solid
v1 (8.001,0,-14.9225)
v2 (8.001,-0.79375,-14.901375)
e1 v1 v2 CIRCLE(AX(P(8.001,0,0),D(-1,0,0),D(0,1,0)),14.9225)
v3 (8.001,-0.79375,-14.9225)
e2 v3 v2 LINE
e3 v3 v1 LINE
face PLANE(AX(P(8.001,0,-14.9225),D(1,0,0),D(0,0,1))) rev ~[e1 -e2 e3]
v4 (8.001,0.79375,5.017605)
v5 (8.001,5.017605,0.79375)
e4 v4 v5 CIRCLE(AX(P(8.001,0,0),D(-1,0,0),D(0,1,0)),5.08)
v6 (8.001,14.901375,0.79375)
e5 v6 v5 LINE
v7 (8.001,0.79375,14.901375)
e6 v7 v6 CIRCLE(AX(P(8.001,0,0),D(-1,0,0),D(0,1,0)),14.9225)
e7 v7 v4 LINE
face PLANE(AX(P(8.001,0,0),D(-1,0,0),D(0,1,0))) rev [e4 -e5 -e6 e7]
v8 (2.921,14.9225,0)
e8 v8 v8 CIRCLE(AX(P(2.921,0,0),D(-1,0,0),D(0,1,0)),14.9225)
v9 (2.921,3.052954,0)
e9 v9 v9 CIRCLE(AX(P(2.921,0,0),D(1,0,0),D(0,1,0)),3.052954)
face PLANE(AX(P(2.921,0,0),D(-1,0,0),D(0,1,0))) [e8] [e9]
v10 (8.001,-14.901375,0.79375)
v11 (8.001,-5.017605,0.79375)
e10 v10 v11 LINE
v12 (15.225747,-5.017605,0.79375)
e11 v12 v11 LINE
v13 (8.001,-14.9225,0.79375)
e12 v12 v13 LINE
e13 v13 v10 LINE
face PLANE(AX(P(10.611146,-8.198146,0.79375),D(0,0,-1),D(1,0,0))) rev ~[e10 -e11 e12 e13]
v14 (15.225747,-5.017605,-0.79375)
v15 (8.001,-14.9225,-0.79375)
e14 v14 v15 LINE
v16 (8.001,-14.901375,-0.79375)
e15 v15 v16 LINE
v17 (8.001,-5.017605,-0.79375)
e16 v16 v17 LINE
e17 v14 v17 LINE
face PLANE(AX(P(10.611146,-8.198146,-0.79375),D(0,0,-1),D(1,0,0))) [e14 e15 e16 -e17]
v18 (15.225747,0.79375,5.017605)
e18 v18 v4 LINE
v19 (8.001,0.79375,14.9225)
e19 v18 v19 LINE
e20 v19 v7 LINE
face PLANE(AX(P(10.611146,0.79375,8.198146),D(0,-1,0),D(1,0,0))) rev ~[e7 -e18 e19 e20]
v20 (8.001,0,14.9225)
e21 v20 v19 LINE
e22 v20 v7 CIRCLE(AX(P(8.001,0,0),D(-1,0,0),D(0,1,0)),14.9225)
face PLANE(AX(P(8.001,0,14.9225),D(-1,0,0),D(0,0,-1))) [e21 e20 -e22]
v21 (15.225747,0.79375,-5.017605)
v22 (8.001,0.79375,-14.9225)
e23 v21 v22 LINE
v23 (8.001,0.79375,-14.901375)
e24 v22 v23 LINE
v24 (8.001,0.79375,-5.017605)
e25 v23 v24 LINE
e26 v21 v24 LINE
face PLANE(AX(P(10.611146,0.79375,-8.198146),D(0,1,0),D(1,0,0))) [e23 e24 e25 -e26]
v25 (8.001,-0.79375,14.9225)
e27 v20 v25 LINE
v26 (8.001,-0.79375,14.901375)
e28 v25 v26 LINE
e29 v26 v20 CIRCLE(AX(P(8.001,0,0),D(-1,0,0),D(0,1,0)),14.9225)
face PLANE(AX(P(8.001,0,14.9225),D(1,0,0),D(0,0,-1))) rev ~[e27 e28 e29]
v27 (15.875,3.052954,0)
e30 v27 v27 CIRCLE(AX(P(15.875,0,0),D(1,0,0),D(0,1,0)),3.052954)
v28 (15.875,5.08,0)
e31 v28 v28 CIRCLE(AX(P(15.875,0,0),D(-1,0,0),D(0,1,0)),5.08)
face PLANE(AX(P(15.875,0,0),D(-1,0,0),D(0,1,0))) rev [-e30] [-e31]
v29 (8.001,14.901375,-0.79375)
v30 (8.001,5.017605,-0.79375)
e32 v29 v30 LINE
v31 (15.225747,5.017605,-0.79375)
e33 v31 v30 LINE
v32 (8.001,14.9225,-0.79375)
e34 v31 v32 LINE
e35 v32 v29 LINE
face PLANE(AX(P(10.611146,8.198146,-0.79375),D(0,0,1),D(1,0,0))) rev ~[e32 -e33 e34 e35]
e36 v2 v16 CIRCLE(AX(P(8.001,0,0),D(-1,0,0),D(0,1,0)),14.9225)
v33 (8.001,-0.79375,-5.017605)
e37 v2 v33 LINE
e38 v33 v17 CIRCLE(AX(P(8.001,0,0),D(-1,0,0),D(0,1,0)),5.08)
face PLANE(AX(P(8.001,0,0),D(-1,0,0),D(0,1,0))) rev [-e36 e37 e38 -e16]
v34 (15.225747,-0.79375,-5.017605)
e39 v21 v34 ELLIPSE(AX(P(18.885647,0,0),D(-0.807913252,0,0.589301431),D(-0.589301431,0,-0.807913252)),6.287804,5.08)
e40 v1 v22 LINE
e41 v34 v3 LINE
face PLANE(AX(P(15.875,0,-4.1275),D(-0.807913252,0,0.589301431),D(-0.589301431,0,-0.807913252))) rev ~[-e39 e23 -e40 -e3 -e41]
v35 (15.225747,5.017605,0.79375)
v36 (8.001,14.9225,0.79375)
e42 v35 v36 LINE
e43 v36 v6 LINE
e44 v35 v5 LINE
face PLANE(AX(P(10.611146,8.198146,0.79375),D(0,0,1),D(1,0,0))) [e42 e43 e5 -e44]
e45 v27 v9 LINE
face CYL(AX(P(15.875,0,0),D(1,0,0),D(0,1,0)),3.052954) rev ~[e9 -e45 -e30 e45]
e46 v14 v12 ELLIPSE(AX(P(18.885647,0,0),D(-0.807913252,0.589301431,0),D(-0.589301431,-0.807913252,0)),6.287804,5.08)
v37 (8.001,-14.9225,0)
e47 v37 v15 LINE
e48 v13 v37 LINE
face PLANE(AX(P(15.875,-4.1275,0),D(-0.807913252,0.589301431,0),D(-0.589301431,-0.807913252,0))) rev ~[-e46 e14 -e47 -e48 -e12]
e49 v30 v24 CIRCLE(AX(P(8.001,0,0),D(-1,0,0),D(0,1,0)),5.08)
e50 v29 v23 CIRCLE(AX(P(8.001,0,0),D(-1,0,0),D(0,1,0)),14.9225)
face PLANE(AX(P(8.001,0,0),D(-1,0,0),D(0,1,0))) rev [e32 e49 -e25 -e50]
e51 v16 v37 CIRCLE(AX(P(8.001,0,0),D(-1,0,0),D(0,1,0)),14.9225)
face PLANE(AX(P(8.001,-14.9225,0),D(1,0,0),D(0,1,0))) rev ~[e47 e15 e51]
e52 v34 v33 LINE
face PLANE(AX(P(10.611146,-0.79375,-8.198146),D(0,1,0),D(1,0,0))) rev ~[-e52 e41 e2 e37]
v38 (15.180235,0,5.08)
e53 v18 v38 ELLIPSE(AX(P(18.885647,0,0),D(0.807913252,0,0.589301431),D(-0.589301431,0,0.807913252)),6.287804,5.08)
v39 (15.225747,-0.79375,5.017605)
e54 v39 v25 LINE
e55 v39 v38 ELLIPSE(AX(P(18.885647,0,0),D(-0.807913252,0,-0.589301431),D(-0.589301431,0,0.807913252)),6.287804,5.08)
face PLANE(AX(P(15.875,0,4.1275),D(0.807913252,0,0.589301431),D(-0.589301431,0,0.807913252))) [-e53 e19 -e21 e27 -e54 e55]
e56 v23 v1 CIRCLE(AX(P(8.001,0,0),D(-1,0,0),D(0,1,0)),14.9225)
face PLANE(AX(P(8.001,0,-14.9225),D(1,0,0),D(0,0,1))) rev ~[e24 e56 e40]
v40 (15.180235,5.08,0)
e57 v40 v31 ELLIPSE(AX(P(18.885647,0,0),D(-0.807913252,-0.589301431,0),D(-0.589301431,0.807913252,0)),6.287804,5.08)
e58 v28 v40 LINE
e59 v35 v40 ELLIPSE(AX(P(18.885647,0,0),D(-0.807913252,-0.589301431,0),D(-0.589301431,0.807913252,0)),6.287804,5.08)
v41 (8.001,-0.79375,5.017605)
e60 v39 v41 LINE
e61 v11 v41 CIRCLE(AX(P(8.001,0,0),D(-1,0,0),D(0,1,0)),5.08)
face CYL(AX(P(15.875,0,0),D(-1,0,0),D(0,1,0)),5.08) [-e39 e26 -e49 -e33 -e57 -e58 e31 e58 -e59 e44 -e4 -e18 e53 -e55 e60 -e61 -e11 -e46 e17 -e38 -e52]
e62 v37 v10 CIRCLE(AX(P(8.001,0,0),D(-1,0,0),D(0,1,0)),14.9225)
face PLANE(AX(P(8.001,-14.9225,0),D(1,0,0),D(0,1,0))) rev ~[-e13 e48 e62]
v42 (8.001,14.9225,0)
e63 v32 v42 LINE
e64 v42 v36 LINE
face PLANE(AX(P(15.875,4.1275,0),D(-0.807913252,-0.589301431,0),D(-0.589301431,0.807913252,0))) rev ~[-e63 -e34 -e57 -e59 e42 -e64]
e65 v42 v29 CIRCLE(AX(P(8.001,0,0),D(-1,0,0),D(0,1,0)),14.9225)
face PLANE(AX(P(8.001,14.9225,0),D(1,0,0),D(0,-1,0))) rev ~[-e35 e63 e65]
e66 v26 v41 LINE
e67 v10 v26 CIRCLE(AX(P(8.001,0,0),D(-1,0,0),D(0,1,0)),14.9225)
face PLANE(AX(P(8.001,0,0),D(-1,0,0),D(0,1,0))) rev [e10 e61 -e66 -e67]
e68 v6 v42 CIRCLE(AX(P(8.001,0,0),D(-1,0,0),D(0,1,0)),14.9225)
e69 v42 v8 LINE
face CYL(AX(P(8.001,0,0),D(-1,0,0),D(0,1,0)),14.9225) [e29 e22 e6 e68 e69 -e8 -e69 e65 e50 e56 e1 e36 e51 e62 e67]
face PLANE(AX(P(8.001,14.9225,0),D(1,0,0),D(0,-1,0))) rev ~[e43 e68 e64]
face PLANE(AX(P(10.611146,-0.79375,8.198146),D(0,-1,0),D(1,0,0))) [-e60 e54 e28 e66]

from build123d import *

# Parameters (mm, degrees)
F2_R            = 3.0529538636
F3_DEPTH        = 15.875
F5_DEPTH        = 0.79375
F5_DEPTH_BACK   = 0.79375
F5_COPIES_COUNT = 4
F6_R            = 3.175
F7_DEPTH        = 2.921


# Not quite as in the source:
# - a pattern or mirror of a feature is missing from the dataset's text; its kind, count and spacing are read off the source's solid


with BuildPart() as f1:
    # F0 (on Top) → F1 (revolve)
    with BuildSketch(Plane.XY):
        Polygon((0, 3.175), (0, 0), (15.875, 0), (15.875, 5.08), (8.001, 5.08), (8.001, 14.9225), (2.921, 14.9225), (2.921, 3.175), align=None)
    revolve(axis=Axis((7.9375, 0, 0), (-1, 0, 0)))

    # F2 (on face) → F3 (cut, through all)
    with BuildSketch(Plane.YZ.offset(15.875)):
        Circle(F2_R)
    extrude(amount=-F3_DEPTH, mode=Mode.SUBTRACT)

    # F4 (on Front) → F5 (join, two sides)
    with BuildSketch(Plane.XZ) as f5_sk:
        Polygon((15.875, 4.1275), (8.001, 14.9225), (8.001, 4.1275), align=None)
    f5 = extrude(amount=F5_DEPTH) + extrude(f5_sk.sketch, amount=-F5_DEPTH_BACK)

    # F5_copies: F5 ×4 about axis
    f5_copies_axis = Axis((0, 0, 0), (1, 0, 0))
    for i in range(1, F5_COPIES_COUNT):
        add(f5.rotate(f5_copies_axis, i * 360 / F5_COPIES_COUNT))

    # F6 (on face) → F7 (cut, through all)
    with BuildSketch(Plane(origin=(0, 0, 0), x_dir=(0, -1, 0), z_dir=(-1, 0, 0))):
        Circle(F6_R)
    extrude(amount=-F7_DEPTH, mode=Mode.SUBTRACT)


solid = f1.part
